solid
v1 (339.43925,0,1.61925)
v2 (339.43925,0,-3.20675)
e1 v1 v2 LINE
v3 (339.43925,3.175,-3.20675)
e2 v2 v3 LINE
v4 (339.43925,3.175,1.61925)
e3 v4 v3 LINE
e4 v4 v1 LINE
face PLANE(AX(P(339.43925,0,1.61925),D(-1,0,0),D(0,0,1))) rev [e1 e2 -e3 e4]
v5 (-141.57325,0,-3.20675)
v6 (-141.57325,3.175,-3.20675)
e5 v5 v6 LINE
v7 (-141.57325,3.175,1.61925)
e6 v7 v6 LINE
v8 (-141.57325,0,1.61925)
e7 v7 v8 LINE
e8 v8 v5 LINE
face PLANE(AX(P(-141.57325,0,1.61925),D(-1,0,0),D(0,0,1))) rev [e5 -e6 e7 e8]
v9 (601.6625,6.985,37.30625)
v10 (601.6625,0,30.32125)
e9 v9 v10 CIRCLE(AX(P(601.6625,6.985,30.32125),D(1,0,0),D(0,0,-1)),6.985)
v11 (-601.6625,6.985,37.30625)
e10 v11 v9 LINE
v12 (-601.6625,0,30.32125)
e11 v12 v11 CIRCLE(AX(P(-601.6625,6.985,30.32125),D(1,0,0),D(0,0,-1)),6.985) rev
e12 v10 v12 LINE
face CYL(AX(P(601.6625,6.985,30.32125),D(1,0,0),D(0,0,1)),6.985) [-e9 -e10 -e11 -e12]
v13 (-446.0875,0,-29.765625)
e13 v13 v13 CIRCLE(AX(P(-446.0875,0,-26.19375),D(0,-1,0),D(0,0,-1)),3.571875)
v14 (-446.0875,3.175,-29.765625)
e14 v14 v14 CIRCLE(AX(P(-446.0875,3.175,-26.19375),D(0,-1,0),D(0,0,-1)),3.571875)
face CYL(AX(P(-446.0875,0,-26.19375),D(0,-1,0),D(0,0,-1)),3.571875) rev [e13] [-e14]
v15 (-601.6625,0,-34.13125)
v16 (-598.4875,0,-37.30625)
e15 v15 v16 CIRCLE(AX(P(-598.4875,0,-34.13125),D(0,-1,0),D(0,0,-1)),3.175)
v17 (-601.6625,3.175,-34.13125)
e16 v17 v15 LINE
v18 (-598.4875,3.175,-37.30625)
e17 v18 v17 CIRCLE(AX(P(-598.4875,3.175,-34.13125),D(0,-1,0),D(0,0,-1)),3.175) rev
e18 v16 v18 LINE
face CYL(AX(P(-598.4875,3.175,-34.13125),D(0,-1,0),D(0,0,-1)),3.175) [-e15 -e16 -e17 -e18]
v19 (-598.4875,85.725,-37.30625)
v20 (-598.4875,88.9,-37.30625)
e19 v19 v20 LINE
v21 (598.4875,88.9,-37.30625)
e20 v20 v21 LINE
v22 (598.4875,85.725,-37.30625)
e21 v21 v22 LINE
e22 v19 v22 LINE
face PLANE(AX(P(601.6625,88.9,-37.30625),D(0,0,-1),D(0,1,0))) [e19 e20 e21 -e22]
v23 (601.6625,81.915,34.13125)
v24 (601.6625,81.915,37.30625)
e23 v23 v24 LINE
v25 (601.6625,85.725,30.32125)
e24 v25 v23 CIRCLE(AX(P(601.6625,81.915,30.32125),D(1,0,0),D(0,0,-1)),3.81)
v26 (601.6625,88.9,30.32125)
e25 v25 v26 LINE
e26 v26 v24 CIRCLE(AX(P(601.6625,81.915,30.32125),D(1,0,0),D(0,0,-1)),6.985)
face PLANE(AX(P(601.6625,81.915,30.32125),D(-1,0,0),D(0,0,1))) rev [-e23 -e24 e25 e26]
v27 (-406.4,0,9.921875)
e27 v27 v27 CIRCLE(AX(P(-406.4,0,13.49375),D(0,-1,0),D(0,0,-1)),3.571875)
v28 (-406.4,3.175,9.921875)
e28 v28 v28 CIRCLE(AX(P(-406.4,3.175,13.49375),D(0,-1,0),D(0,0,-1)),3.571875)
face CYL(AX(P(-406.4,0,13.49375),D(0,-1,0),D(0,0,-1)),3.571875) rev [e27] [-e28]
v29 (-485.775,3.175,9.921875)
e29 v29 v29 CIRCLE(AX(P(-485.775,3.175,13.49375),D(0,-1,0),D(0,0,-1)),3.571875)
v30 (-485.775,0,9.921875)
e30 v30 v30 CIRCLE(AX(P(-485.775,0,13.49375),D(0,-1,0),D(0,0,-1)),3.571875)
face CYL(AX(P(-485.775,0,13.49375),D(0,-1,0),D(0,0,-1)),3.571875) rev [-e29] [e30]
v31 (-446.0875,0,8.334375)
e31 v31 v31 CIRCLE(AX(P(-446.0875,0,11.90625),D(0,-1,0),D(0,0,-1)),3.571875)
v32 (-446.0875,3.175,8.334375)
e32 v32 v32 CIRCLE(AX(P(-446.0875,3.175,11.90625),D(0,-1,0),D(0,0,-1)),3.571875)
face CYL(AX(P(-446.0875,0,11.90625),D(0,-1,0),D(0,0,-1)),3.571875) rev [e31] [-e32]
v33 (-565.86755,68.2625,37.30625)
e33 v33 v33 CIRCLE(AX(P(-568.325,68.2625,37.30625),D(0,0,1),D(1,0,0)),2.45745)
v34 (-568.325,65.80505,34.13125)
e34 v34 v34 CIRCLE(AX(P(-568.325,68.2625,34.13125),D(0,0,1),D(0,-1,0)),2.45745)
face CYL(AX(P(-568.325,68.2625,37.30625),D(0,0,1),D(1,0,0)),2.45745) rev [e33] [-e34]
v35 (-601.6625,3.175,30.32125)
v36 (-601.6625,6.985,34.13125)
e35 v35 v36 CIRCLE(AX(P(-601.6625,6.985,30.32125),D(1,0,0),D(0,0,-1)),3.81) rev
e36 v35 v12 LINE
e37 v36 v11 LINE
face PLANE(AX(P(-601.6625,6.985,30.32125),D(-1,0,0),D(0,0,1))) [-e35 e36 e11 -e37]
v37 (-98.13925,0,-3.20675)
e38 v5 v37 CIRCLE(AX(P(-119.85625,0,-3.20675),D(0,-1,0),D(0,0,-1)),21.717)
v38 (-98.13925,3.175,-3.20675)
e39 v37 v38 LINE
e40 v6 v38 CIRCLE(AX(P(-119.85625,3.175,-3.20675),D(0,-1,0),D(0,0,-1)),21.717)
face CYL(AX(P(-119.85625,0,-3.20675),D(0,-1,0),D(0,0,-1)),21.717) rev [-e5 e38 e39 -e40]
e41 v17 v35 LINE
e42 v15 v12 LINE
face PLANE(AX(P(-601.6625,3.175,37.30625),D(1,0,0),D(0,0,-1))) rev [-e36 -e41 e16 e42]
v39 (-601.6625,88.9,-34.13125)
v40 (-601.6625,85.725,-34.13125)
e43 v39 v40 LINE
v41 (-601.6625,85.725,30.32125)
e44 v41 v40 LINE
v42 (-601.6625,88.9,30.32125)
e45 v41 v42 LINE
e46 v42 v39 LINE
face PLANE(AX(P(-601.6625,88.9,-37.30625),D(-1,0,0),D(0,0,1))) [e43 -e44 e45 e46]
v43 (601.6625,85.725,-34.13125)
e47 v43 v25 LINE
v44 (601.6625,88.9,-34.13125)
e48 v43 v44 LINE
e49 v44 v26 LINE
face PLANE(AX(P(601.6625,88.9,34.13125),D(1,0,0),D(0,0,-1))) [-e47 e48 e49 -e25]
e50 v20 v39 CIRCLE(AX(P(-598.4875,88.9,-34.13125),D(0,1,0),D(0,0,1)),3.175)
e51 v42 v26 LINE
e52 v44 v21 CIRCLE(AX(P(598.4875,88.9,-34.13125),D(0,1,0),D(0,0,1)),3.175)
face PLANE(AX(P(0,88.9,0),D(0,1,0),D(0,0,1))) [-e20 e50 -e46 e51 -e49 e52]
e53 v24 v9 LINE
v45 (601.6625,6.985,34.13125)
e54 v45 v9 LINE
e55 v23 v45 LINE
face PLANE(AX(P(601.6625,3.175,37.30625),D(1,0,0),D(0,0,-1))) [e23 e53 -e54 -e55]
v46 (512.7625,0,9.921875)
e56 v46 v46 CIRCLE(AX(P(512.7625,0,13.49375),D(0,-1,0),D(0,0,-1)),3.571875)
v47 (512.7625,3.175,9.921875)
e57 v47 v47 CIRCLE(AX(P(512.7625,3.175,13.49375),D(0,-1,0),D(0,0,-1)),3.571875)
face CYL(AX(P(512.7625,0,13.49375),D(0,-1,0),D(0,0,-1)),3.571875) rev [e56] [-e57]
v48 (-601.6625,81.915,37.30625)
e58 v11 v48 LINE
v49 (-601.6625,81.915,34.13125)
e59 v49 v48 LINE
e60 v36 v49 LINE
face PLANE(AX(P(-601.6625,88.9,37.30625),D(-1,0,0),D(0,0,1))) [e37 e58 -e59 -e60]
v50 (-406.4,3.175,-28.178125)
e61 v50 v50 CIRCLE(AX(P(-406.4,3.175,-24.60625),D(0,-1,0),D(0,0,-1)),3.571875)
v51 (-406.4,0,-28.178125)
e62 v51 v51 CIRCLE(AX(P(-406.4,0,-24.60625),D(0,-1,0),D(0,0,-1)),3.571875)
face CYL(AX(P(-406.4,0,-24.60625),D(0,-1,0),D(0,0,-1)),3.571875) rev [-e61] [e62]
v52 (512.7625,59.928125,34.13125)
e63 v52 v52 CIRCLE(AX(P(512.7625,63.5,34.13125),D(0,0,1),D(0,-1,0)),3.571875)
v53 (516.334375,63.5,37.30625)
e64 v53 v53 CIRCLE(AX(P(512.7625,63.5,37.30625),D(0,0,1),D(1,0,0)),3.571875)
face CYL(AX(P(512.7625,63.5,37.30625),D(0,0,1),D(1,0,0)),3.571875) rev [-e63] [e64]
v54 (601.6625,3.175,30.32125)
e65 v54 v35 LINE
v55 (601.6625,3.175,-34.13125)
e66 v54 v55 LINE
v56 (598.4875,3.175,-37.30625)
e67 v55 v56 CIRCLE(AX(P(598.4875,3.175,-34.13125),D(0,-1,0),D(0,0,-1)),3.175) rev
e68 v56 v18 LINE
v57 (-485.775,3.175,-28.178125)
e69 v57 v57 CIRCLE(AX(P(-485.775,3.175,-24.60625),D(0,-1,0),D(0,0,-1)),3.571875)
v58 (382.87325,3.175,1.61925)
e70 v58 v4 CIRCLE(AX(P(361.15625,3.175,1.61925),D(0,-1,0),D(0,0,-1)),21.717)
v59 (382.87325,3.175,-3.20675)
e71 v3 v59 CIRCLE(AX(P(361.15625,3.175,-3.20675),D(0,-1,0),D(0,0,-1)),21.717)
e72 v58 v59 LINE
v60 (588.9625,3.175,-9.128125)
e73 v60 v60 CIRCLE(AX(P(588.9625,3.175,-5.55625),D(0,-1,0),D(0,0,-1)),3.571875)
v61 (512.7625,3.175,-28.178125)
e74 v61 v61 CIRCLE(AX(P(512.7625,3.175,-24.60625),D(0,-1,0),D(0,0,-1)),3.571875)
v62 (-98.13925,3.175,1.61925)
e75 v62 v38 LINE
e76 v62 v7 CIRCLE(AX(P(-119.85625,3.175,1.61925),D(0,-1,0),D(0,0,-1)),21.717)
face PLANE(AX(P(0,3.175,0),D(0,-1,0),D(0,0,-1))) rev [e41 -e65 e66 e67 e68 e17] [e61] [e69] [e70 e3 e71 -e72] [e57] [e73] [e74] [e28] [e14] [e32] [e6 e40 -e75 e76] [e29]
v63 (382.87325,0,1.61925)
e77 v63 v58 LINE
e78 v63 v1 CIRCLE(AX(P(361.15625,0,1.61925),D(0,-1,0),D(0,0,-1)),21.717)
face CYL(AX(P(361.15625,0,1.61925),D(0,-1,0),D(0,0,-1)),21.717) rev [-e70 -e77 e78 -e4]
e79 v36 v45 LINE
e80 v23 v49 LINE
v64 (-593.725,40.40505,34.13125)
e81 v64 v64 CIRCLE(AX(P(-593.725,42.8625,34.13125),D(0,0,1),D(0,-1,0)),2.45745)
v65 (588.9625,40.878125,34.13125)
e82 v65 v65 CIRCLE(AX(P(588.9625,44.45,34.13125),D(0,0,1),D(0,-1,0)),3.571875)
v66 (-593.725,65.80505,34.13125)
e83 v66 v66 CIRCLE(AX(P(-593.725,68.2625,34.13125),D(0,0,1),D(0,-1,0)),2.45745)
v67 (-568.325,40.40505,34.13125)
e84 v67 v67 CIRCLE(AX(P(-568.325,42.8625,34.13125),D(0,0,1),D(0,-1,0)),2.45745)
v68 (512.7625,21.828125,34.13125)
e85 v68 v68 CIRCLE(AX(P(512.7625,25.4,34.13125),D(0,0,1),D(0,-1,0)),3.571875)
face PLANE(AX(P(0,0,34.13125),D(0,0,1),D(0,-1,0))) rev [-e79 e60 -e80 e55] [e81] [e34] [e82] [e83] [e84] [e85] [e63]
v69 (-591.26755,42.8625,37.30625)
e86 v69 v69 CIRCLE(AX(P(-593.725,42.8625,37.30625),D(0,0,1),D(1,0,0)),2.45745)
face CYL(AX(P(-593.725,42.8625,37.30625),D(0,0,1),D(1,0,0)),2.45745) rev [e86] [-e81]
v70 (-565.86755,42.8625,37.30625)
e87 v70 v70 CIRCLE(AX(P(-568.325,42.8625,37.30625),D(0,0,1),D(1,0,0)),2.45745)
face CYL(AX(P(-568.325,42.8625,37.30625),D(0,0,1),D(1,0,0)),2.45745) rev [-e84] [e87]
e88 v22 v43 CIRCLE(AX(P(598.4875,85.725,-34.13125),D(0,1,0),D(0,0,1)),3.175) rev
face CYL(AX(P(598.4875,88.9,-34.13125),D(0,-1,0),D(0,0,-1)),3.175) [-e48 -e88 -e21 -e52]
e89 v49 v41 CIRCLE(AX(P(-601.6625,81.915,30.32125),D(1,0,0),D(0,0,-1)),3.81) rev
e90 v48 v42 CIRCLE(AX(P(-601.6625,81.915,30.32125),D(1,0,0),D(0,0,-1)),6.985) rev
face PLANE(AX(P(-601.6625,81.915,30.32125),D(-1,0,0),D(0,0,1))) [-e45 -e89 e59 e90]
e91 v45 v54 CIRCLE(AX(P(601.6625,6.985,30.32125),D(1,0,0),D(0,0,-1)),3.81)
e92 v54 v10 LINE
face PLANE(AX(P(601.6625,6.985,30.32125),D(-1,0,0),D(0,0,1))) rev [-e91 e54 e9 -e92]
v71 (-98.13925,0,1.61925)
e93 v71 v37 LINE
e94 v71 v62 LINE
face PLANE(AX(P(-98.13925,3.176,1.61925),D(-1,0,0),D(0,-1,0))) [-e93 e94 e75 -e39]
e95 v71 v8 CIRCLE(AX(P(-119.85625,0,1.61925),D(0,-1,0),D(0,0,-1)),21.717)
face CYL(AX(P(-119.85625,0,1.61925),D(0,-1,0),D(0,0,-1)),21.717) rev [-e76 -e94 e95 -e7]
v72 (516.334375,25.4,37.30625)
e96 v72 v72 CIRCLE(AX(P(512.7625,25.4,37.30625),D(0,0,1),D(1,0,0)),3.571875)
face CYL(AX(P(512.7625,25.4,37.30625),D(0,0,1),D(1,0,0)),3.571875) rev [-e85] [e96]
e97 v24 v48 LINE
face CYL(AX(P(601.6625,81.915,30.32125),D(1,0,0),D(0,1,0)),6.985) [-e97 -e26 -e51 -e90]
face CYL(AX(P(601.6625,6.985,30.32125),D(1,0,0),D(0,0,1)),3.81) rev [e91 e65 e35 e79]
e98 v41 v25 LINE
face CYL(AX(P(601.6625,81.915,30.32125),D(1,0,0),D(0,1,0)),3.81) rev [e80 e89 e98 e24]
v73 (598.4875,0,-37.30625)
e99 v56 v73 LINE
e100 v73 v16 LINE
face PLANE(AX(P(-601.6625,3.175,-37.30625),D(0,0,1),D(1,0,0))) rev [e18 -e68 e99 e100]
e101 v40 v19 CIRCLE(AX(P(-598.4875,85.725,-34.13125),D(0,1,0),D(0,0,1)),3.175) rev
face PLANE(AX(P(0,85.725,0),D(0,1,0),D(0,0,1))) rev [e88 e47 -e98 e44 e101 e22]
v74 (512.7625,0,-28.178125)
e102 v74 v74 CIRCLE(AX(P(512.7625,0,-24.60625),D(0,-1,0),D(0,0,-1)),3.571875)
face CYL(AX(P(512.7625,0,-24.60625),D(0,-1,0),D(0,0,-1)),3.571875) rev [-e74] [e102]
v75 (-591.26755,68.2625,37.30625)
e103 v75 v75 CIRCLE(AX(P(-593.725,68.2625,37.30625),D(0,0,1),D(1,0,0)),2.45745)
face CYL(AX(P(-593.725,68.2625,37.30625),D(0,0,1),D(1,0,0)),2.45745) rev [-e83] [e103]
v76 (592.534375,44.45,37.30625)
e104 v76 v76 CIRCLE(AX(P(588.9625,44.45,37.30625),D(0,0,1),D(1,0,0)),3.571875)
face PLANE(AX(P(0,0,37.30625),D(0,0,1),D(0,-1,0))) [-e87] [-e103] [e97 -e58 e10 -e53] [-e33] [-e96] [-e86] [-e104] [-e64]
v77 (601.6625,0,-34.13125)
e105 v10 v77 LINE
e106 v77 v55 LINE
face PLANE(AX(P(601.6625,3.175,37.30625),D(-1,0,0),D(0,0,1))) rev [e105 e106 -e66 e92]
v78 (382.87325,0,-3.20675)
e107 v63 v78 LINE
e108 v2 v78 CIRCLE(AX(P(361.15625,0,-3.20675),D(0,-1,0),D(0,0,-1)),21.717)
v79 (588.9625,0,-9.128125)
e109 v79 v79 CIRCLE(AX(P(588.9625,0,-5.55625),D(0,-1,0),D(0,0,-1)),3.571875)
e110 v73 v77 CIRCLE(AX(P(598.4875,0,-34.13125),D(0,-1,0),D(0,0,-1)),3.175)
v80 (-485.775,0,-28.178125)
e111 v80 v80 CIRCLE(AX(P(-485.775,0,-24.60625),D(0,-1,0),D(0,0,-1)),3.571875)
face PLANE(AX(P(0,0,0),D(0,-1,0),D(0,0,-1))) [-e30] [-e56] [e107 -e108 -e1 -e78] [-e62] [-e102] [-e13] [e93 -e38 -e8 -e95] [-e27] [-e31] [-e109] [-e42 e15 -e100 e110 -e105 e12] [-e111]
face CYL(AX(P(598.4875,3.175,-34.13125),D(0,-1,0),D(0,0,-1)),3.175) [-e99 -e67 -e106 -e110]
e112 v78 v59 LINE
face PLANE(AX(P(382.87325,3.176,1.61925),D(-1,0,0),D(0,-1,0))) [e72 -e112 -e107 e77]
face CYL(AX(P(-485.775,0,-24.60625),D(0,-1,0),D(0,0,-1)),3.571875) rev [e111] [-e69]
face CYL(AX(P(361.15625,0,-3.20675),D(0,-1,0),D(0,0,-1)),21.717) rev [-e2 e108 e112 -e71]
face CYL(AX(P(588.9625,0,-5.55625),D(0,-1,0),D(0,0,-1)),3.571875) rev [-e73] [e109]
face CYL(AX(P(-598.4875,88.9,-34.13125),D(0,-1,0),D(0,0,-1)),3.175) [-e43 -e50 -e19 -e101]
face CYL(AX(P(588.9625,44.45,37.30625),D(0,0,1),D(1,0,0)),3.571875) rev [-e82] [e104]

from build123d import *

# Parameters (mm, degrees)
SKETCH1_W                           = 1203.325
SKETCH1_H                           = 74.6125
BASE_FLANGE1_DEPTH                  = 3.175
EDGE_FLANGE1_STRIP_W                = 20.32
EDGE_FLANGE1_STRIP_H                = 3.175
EDGE_FLANGE1_STRIP_CUT_DEPTH        = 1203.325
EDGE_FLANGE1_DEPTH                  = 1203.325
EDGE_FLANGE2_STRIP_W                = 20.32
EDGE_FLANGE2_STRIP_H                = 3.175
EDGE_FLANGE2_STRIP_CUT_DEPTH        = 1203.325
EDGE_FLANGE2_DEPTH                  = 1203.325
F_9_32_0_28125_DIAMETER_HOLE3_D     = 7.14375
F_9_32_0_28125_DIAMETER_HOLE3_DEPTH = 3.175
FILLET1_R                           = 3.175
F_9_32_0_28125_DIAMETER_HOLE1_D     = 7.14375
F_9_32_0_28125_DIAMETER_HOLE1_DEPTH = 3.175
F_9_32_0_28125_DIAMETER_HOLE2_D     = 7.14375
F_1_1_71_DOWEL_SLOT1_DEPTH          = 3.175
F_10_0_1935_DIAMETER_HOLE1_D        = 4.9149
LPATTERN2_COUNT                     = 2
LPATTERN2_PITCH                     = 25.4
LPATTERN2_COUNT_DIR2                = 2
LPATTERN2_PITCH_DIR2                = 25.4


# Read off the part's stored shape, not the designer's step: 1 (1.71) Dowel Slot1
# Sheet-metal steps are written as plain solids
with BuildPart() as part:
    # Sketch1 → Base-Flange1 (new body)
    with BuildSketch(Plane(origin=(0, 0, 0), x_dir=(1, 0, 0), z_dir=(0, 1, 0))):
        Rectangle(SKETCH1_W, SKETCH1_H)
    extrude(amount=BASE_FLANGE1_DEPTH)

    # Edge-Flange1 strip (across the edge) → Edge-Flange1 strip cut (cut)
    with BuildSketch(Plane(origin=(-601.6625, 3.175, 37.30625), x_dir=(0, 0, -1), z_dir=(1, 0, 0))):
        with Locations((-3.175, -1.5875)):
            Rectangle(EDGE_FLANGE1_STRIP_W, EDGE_FLANGE1_STRIP_H)
    extrude(amount=EDGE_FLANGE1_STRIP_CUT_DEPTH, mode=Mode.SUBTRACT)

    # Edge-Flange1 section (across the edge) → Edge-Flange1 (add)
    with BuildSketch(Plane(origin=(-601.6625, 3.175, 37.30625), x_dir=(0, 0, -1), z_dir=(1, 0, 0))):
        with BuildLine():
            Line((0, 3.81), (0, 85.725))
            Line((0, 85.725), (3.175, 85.725))
            Line((3.175, 85.725), (3.175, 3.81))
            ThreePointArc((3.175, 3.81), (4.290923164, 1.115923164), (6.985, 0))
            Line((6.985, 0), (6.985, -3.175))
            ThreePointArc((6.985, -3.175), (2.045859133, -1.129140867), (0, 3.81))
        make_face()
    extrude(amount=EDGE_FLANGE1_DEPTH)

    # Edge-Flange2 strip (across the edge) → Edge-Flange2 strip cut (cut)
    with BuildSketch(Plane(origin=(-601.6625, 88.9, 34.13125), x_dir=(0, -1, 0), z_dir=(1, 0, 0))):
        with Locations((-3.175, -1.5875)):
            Rectangle(EDGE_FLANGE2_STRIP_W, EDGE_FLANGE2_STRIP_H)
    extrude(amount=EDGE_FLANGE2_STRIP_CUT_DEPTH, mode=Mode.SUBTRACT)

    # Edge-Flange2 section (across the edge) → Edge-Flange2 (add)
    with BuildSketch(Plane(origin=(-601.6625, 88.9, 34.13125), x_dir=(0, -1, 0), z_dir=(1, 0, 0))):
        with BuildLine():
            Line((0, 3.81), (0, 71.4375))
            Line((0, 71.4375), (3.175, 71.4375))
            Line((3.175, 71.4375), (3.175, 3.81))
            ThreePointArc((3.175, 3.81), (4.290923164, 1.115923164), (6.985, 0))
            Line((6.985, 0), (6.985, -3.175))
            ThreePointArc((6.985, -3.175), (2.045859133, -1.129140867), (0, 3.81))
        make_face()
    extrude(amount=EDGE_FLANGE2_DEPTH)

    # 9/32 (0.28125) Diameter Hole3
    with Locations(Plane(origin=(0, 0, 0), x_dir=(-1, 0, 0), z_dir=(0, -1, 0))):
        with Locations((446.0875, -11.90625), (446.0875, 26.19375), (485.775, 24.60625), (485.775, -13.49375), (406.4, -13.49375), (406.4, 24.60625)):
            Hole(F_9_32_0_28125_DIAMETER_HOLE3_D / 2, depth=F_9_32_0_28125_DIAMETER_HOLE3_DEPTH)

    # Fillet1
    fillet1_edges = [part.edges().sort_by_distance(p)[0] for p in [
        (-601.6625, 87.3125, -37.30625),
        (601.6625, 87.3125, -37.30625),
        (-601.6625, 1.5875, -37.30625),
        (601.6625, 1.5875, -37.30625),
    ]]
    fillet(fillet1_edges, radius=FILLET1_R)

    # 9/32 (0.28125) Diameter Hole1
    with Locations(Plane(origin=(0, 0, 0), x_dir=(-1, 0, 0), z_dir=(0, -1, 0))):
        with Locations((-588.9625, 5.55625), (-512.7625, -13.49375), (-512.7625, 24.60625)):
            Hole(F_9_32_0_28125_DIAMETER_HOLE1_D / 2, depth=F_9_32_0_28125_DIAMETER_HOLE1_DEPTH)

    # 9/32 (0.28125) Diameter Hole2 (through all)
    with Locations(Plane.XY.offset(37.30625)):
        with Locations((588.9625, 44.45), (512.7625, 63.5), (512.7625, 25.4)):
            Hole(F_9_32_0_28125_DIAMETER_HOLE2_D / 2)

    # 1 (1.71) Dowel Slot1 outline → 1 (1.71) Dowel Slot1 (cut)
    with BuildSketch(Plane(origin=(0, 0, 0), x_dir=(1, 0, 0), z_dir=(0, 1, 0))):
        with BuildLine():
            ThreePointArc((382.87325, 3.20675), (361.15625, 24.92375), (339.43925, 3.20675))
            Line((339.43925, 3.20675), (339.43925, -1.61925))
            ThreePointArc((339.43925, -1.61925), (361.15625, -23.33625), (382.87325, -1.61925))
            Line((382.87325, -1.61925), (382.87325, 3.20675))
        make_face()
        with BuildLine():
            ThreePointArc((-98.13925, 3.20675), (-119.85625, 24.92375), (-141.57325, 3.20675))
            Line((-141.57325, 3.20675), (-141.57325, -1.61925))
            ThreePointArc((-141.57325, -1.61925), (-119.85625, -23.33625), (-98.13925, -1.61925))
            Line((-98.13925, -1.61925), (-98.13925, 3.20675))
        make_face()
    extrude(amount=F_1_1_71_DOWEL_SLOT1_DEPTH, mode=Mode.SUBTRACT)

    # #10 (0.1935) Diameter Hole1 (through all)
    with Locations(Plane.XY.offset(37.30625)):
        with Locations((-593.725, 68.2625)):
            f_10_0_1935_diameter_hole1 = Hole(F_10_0_1935_DIAMETER_HOLE1_D / 2)

    # LPattern2: 10 _0.1935_ Diameter Hole1 2 × 2
    with Locations(*[(i * LPATTERN2_PITCH, -j * LPATTERN2_PITCH_DIR2, 0) for i in range(LPATTERN2_COUNT) for j in range(LPATTERN2_COUNT_DIR2) if (i, j) != (0, 0)]):
        add(f_10_0_1935_diameter_hole1, mode=Mode.SUBTRACT)


solid = part.part
